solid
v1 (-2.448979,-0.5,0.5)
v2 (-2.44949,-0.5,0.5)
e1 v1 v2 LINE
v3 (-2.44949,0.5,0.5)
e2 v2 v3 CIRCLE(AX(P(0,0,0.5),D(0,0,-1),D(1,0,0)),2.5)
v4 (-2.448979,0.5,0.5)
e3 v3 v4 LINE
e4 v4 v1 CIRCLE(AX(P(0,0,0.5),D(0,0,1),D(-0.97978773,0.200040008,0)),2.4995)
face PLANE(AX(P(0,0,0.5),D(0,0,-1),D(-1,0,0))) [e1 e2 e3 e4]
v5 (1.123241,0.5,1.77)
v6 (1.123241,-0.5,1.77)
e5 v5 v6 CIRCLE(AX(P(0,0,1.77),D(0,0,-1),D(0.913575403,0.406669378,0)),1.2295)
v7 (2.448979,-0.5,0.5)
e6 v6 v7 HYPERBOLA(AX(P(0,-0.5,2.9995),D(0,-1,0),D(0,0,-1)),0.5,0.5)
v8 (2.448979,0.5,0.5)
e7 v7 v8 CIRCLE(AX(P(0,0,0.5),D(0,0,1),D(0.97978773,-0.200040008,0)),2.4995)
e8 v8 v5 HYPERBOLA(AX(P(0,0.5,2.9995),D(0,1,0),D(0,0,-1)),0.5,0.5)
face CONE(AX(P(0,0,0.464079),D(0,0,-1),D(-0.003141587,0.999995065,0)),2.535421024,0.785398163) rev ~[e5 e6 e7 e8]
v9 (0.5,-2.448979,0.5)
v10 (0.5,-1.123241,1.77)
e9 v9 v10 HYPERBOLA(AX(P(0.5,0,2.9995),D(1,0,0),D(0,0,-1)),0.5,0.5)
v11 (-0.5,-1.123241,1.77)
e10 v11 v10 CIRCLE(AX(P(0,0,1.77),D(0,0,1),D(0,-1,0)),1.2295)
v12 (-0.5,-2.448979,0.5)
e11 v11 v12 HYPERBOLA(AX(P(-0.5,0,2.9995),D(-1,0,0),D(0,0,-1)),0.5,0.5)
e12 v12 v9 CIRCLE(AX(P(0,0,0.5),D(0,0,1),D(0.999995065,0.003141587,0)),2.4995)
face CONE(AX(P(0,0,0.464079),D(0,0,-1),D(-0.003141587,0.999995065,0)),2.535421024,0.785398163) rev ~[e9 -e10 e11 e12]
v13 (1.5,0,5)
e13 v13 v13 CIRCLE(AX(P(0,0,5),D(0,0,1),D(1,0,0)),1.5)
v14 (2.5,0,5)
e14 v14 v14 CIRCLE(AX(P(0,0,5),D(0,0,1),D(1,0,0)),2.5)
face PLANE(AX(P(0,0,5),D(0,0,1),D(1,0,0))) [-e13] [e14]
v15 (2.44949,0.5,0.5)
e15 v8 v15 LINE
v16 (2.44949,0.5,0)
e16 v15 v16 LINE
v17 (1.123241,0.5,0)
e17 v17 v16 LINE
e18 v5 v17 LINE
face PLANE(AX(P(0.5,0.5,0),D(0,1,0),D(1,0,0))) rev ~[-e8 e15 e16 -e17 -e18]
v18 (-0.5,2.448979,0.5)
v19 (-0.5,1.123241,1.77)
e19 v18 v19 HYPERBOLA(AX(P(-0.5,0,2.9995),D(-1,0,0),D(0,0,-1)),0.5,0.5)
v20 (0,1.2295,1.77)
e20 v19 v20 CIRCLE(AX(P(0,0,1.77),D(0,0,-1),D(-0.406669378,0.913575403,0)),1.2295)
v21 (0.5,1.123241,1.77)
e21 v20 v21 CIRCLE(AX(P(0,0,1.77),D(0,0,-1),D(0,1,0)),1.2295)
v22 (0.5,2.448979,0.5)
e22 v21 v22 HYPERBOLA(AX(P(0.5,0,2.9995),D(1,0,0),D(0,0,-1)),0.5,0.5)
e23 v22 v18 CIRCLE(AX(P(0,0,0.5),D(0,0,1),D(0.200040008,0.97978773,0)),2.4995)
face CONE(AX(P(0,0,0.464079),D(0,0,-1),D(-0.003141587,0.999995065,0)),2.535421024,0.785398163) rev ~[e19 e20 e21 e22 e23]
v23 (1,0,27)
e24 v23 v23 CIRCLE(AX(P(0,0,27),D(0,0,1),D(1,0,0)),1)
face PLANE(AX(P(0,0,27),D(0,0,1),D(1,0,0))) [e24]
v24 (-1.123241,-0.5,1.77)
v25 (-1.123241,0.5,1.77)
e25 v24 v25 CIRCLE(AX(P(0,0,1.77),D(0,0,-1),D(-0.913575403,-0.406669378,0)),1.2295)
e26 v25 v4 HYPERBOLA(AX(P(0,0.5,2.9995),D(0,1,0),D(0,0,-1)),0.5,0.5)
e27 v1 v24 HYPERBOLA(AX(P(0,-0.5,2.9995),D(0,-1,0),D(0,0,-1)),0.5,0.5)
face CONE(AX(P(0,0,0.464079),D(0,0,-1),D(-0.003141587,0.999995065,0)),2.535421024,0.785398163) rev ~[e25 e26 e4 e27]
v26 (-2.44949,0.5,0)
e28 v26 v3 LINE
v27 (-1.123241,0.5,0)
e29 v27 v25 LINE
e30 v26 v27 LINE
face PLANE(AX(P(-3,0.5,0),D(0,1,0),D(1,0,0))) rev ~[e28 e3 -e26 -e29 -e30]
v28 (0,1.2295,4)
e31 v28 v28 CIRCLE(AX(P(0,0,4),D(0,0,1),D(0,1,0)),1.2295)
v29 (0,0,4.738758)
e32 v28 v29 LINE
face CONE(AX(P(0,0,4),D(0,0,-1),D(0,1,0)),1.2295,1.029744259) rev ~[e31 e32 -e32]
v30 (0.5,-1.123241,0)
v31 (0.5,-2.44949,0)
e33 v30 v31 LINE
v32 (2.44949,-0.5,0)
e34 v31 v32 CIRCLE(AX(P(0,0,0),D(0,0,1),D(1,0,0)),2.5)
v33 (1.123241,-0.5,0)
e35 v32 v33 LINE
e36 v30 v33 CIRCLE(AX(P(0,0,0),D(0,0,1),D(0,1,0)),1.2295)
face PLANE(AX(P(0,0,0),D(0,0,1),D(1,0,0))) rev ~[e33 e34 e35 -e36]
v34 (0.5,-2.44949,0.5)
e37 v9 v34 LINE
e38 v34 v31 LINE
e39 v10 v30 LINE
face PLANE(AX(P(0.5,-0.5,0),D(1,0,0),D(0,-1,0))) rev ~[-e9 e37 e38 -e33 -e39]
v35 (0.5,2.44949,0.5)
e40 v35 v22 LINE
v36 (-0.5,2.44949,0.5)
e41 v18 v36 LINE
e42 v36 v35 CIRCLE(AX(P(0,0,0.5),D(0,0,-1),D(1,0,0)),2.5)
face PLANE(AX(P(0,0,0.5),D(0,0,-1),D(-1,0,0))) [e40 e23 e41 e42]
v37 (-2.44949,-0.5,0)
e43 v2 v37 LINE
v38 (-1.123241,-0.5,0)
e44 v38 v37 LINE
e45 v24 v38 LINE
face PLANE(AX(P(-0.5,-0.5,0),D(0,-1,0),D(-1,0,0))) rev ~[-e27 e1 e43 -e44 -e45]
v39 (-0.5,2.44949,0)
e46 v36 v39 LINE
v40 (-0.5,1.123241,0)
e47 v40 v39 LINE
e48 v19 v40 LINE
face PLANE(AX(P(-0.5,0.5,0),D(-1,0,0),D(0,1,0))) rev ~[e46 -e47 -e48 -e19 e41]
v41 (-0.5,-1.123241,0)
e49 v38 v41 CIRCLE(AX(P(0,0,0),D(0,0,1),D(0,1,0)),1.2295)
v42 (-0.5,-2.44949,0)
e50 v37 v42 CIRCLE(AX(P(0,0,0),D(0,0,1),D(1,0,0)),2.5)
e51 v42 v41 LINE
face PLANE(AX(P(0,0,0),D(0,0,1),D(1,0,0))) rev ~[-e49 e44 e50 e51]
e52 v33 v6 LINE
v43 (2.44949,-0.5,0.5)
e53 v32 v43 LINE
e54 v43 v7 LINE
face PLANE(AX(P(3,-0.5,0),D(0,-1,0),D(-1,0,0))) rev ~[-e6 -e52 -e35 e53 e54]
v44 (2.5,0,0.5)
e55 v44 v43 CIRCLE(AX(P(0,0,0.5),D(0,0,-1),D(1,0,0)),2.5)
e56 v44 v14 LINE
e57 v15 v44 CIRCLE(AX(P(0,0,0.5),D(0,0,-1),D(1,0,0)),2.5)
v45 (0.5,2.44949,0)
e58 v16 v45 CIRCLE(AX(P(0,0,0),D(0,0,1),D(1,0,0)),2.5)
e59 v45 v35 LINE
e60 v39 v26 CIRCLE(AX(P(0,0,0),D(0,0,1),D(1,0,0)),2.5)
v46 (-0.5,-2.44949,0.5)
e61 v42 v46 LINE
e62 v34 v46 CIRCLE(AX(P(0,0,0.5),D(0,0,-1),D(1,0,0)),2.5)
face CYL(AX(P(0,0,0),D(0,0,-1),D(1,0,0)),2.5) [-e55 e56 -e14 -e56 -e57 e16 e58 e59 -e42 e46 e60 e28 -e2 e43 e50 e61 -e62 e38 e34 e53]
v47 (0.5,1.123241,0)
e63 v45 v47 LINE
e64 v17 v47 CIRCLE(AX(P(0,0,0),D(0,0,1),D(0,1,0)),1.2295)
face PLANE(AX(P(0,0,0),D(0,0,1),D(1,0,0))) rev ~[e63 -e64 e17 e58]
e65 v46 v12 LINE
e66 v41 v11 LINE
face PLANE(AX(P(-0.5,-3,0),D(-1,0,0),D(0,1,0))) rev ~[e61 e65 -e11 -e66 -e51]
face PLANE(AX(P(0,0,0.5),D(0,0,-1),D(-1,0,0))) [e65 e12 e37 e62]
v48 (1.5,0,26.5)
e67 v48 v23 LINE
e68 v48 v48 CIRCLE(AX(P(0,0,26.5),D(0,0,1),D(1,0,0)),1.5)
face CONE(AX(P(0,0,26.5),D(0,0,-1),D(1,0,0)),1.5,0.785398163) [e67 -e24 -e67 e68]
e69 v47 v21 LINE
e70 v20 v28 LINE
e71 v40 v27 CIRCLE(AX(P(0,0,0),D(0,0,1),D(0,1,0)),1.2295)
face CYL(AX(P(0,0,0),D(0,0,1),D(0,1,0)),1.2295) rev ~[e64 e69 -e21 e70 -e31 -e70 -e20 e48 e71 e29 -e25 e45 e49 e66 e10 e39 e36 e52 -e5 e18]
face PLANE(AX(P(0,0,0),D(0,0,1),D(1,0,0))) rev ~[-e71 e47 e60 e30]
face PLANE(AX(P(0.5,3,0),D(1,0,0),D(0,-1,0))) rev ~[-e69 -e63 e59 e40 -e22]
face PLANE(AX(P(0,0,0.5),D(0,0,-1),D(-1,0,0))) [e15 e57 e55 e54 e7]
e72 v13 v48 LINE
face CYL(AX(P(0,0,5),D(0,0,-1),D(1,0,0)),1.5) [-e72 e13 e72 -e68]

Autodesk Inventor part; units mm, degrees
ref_plane "YZ Plane" through (0, 0, 0) normal (1, 0, 0) x (0, 1, 0)
ref_plane "XZ Plane" through (0, 0, 0) normal (0, 1, 0) x (-1, 0, 0)
ref_plane "XY Plane" through (0, 0, 0) normal (0, 0, 1) x (1, 0, 0)
sketch "Esboço1" plane through (0, 0, 0) normal (0, 0, 1) x (1, 0, 0)
  circle A0 centre (0, 0) radius 2.5
  dimension "d0" = 5
extrude "Extrusão1" add sketch "Esboço1" along normal blind 5
sketch "Esboço2" plane through (0, 0, 5) normal (0, 0, 1) x (1, 0, 0)
  circle A0 centre (0, 0) radius 1.5
  dimension "d3" = 3
extrude "Extrusão2" add sketch "Esboço2" along normal blind 22
thread "Rosca1" size "M3x0.5" class "6g" standard "ANSI Metric M Profile" length 15 offset 7
sketch "Esboço3" plane through (0, 0, 0) normal (0, 0, -1) x (-1, 0, 0)
  point P0 (0, 0)
  point P1 (0, 0)
  dimension "d15" = 0
  dimension "d16" = 0
hole "Furo1" at (0, 0, 0) direction (0, 0, 1) diameter 2.459 depth 4 tip angle 118 thread size "M3x0.5" class "6H" standard "ANSI Metric M Profile"
sketch "Esboço4" plane through (0, 0, 0) normal (0, 0, -1) x (-1, 0, 0)
  line L0 (-0.5, -3) -> (0.5, -3)
  line L1 (0.5, -3) -> (0.5, 3)
  line L2 (0.5, 3) -> (-0.5, 3)
  line L3 (-0.5, 3) -> (-0.5, -3)
  line L4 (-0.5, -3) -> (0.5, 3) construction
  line L5 (0.5, -3) -> (-0.5, 3) construction
  line L6 (-3, -0.5) -> (3, -0.5)
  line L7 (3, -0.5) -> (3, 0.5)
  line L8 (3, 0.5) -> (-3, 0.5)
  line L9 (-3, 0.5) -> (-3, -0.5)
  line L10 (-3, -0.5) -> (3, 0.5) construction
  line L11 (3, -0.5) -> (-3, 0.5) construction
  point P0 (0, 0)
  point P1 (-0.5, -0.5)
  point P2 (-0.5, 0.5)
  point P3 (0.5, 0.5)
  point P4 (0.5, -0.5)
  dimension "d17" = 1
  dimension "d18" = 6
  dimension "d19" = 6
  dimension "d20" = 1
extrude "Extrusão3" cut sketch "Esboço4" against normal blind 0.5 contours L3 L6 L1 L0 | L6 L9 L8 L3 | L1 L8 L7 L6 | L3 L2 L1 L8
chamfer "Chanfro1" distance 1.27 angle 45 3 edges at (0, -1.2295, 0.5) (1.2295, 0, 0.5) (-1.2295, 0, 0.5)
chamfer "Chanfro2" distance 0.5 angle 45 1 edges at (-1.5, 0, 27)
properties part number "PARAFUSO"
